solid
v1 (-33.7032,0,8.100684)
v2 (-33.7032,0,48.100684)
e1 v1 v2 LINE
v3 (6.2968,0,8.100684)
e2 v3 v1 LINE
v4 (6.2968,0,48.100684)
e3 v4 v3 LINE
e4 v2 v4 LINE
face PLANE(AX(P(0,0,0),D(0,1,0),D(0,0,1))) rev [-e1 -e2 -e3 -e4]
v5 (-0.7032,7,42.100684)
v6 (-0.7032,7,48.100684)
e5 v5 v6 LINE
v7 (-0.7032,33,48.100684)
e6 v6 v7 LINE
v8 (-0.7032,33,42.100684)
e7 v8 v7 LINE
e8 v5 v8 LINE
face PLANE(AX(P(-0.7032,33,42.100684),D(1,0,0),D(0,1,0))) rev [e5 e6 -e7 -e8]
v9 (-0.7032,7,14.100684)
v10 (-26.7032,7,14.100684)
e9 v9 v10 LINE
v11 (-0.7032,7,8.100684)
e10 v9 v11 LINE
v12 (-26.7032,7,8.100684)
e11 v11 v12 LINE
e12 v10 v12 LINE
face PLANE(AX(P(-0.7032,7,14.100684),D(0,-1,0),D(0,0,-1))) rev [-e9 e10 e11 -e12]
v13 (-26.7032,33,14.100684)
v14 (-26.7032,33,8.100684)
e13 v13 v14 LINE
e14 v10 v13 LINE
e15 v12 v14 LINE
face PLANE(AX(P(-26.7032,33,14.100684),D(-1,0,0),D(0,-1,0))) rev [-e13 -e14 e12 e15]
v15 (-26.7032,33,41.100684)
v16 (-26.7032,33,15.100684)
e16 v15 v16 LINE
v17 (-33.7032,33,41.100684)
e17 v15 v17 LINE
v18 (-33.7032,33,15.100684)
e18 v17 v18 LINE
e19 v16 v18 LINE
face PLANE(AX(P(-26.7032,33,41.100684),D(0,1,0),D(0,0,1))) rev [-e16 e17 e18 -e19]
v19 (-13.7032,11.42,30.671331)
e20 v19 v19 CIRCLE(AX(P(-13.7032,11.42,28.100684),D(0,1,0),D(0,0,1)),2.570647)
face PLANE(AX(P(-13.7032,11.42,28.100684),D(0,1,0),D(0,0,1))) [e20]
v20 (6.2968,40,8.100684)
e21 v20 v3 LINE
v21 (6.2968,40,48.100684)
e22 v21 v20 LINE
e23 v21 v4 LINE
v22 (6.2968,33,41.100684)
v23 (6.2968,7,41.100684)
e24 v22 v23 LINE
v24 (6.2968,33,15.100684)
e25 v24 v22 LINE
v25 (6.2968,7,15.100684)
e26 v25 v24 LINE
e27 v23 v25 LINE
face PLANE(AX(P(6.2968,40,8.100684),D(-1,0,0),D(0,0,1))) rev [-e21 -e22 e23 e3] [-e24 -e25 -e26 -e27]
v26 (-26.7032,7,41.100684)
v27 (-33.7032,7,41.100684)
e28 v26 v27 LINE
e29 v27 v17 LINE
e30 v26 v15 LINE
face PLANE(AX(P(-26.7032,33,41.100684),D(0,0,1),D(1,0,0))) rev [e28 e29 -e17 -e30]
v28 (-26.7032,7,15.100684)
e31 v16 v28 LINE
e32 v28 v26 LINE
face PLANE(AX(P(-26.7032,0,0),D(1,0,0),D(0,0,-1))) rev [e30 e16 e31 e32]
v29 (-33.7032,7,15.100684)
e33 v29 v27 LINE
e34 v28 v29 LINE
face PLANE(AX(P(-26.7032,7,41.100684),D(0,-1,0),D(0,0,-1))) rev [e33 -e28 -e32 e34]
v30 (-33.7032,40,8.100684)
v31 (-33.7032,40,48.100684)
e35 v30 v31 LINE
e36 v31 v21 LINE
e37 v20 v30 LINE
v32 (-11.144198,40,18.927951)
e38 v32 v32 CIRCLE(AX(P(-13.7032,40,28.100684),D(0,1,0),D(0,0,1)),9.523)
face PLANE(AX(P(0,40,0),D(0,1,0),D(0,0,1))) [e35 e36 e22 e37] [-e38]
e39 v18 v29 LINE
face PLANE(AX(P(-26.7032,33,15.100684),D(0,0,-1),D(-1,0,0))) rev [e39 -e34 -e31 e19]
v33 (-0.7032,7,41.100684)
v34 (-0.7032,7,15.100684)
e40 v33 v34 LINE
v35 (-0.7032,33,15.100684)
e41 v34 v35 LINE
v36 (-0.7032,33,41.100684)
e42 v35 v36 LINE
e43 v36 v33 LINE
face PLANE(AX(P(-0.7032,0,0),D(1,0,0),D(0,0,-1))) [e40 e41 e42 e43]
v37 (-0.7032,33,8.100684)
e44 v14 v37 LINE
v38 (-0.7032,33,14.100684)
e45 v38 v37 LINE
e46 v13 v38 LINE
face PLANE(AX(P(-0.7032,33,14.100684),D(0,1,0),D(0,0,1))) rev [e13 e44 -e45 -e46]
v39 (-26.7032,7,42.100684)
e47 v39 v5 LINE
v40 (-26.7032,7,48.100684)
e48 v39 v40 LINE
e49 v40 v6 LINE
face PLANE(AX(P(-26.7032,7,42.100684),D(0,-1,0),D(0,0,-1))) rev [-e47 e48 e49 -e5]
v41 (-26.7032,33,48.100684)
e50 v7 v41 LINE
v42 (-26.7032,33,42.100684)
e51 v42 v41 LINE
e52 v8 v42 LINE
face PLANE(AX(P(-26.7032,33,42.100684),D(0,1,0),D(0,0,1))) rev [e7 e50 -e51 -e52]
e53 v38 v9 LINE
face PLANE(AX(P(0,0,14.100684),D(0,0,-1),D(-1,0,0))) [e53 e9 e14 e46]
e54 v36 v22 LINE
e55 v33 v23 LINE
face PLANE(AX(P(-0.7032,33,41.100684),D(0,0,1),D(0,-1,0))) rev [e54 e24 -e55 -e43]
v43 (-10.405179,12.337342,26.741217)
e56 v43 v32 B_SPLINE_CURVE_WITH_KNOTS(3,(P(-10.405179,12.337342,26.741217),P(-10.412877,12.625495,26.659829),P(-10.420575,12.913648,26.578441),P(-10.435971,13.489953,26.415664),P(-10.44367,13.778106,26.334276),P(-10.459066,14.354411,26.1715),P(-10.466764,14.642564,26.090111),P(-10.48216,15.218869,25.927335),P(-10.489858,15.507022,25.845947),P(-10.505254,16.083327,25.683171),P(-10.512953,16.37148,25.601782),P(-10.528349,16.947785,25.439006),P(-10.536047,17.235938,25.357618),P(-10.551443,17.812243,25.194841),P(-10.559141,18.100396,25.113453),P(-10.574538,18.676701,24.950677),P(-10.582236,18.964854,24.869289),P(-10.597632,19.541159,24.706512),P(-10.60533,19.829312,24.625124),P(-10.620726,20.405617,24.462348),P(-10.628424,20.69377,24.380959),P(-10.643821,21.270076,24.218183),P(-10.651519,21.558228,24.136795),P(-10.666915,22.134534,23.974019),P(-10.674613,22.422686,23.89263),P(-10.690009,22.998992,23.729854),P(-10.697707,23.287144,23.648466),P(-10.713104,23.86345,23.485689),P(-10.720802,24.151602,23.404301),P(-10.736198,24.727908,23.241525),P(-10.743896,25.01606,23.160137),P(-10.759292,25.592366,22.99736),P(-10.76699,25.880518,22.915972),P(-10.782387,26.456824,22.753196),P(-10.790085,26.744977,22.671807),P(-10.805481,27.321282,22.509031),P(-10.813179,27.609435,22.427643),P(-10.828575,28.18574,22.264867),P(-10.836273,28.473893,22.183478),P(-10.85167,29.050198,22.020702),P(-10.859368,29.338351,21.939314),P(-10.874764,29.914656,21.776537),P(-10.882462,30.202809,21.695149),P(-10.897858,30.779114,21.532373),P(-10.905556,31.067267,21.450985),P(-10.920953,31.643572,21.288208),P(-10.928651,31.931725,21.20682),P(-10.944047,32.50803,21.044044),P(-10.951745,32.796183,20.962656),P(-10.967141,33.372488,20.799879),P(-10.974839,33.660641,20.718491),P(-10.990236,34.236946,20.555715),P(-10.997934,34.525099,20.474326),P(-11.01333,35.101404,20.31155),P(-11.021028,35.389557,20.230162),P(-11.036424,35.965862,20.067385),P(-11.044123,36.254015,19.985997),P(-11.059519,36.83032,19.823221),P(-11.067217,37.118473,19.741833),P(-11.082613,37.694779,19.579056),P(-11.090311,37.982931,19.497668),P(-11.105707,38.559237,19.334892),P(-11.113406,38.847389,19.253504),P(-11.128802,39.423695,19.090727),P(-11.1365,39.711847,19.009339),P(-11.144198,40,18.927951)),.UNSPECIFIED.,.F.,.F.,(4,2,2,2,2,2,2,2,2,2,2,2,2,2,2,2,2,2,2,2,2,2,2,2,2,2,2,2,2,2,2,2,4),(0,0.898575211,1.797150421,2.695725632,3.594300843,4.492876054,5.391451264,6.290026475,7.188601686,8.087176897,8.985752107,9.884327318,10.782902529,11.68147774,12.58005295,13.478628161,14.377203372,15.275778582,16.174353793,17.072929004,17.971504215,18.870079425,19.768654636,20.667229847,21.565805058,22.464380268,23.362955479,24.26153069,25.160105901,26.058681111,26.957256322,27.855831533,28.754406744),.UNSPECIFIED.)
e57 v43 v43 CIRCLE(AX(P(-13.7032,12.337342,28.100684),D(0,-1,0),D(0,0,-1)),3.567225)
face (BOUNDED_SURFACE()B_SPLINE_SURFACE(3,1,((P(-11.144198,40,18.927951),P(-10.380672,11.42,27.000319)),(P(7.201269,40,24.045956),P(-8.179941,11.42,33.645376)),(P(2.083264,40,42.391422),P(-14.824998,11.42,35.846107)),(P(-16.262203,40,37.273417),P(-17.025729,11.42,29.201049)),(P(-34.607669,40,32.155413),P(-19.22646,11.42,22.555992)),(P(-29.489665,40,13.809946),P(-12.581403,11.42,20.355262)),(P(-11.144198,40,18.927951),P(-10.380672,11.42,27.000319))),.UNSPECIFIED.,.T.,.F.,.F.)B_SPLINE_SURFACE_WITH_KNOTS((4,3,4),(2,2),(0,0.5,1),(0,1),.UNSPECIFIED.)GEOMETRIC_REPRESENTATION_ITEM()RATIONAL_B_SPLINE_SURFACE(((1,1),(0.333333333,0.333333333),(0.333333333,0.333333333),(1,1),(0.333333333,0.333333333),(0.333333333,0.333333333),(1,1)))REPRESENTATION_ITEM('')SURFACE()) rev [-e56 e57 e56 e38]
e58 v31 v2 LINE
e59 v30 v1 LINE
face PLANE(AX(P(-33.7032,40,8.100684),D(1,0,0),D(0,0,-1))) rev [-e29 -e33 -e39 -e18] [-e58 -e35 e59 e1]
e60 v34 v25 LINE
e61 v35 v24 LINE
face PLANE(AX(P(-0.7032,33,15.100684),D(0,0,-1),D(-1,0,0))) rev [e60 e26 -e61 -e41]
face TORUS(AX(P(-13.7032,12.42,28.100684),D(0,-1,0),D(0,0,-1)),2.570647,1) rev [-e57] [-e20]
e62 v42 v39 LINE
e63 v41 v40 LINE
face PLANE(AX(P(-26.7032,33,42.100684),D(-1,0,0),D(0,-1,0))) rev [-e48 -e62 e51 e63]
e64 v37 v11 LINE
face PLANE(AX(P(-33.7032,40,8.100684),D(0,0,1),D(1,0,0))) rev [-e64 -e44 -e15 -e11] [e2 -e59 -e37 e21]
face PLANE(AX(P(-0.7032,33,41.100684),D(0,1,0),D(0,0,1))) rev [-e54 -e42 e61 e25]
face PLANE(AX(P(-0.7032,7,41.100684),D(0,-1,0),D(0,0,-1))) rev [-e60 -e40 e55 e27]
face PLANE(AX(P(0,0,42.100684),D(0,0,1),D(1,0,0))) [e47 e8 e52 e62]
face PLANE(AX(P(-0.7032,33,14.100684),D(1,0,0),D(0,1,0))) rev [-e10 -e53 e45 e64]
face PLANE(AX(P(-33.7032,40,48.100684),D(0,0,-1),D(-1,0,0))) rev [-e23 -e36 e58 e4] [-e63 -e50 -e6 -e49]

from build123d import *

# Parameters (mm, degrees)
ESBO_O1_W                = 40
ESBO_O1_H                = 40
RESSALTO_EXTRUS_O1_DEPTH = 40
FILETE1_R                = 1
ESBO_O10_W               = 26
ESBO_O10_H               = 26
CORTE_EXTRUS_O3_DEPTH    = 7
ESBO_O11_W               = 26
ESBO_O11_H               = 26
CORTE_EXTRUS_O6_DEPTH    = 6
ESBO_O12_W               = 26
ESBO_O12_H               = 26
CORTE_EXTRUS_O7_DEPTH    = 6
ESBO_O13_W               = 26
ESBO_O13_H               = 26
CORTE_EXTRUS_O8_DEPTH    = 7


with BuildPart() as part:
    # Esboço1 → Ressalto-extrusão1 (new body)
    with BuildSketch(Plane(origin=(0, 0, 0), x_dir=(1, 0, 0), z_dir=(0, 1, 0))):
        with Locations((-13.703200382, -28.10068404)):
            Rectangle(ESBO_O1_W, ESBO_O1_H)
    extrude(amount=RESSALTO_EXTRUS_O1_DEPTH)

    # Loft de corte4: read off the stored shape, not the designer's step
    # Loft de corte4: loft between two sections, ruled curve by curve
    loft_de_corte4_from = [
        Edge.make_bspline([(-11.144198007, 40, 18.927950759), (7.201268555, 40, 24.04595551), (2.083263805, 40, 42.391422072), (-16.262202757, 40, 37.273417321), (-34.607669319, 40, 32.155412571), (-29.489664569, 40, 13.809946009), (-11.144198007, 40, 18.927950759)], [0, 0, 0, 0, 0.5, 0.5, 0.5, 1, 1, 1, 1], 3, [1, 0.333333333, 0.333333333, 1, 0.333333333, 0.333333333, 1]),
    ]
    loft_de_corte4_to = [
        Edge.make_bspline([(-10.380671839, 11.42, 27.000318611), (-8.179940979, 11.42, 33.645375697), (-14.824998066, 11.42, 35.846106557), (-17.025728925, 11.42, 29.20104947), (-19.226459785, 11.42, 22.555992384), (-12.581402699, 11.42, 20.355261524), (-10.380671839, 11.42, 27.000318611)], [0, 0, 0, 0, 0.5, 0.5, 0.5, 1, 1, 1, 1], 3, [1, 0.333333333, 0.333333333, 1, 0.333333333, 0.333333333, 1]),
    ]
    loft_de_corte4 = Solid(Shell([*[Face.make_surface_from_curves(loft_de_corte4_from[k], loft_de_corte4_to[k]) for k in range(1)], Face(Wire(loft_de_corte4_from)), Face(Wire(loft_de_corte4_to))]))
    add(loft_de_corte4, mode=Mode.SUBTRACT)

    # Filete1
    filete1_edges = [part.edges().sort_by_distance(p)[0] for p in [
        (-17.025728925, 11.42, 29.20104947),
    ]]
    fillet(filete1_edges, radius=FILETE1_R)

    # Esboço10 → Corte-extrusão3 (cut)
    with BuildSketch(Plane.ZY.offset(33.703200382)):
        with Locations((28.10068404, 20)):
            Rectangle(ESBO_O10_W, ESBO_O10_H)
    extrude(amount=-CORTE_EXTRUS_O3_DEPTH, mode=Mode.SUBTRACT)

    # Esboço11 → Corte-extrusão6 (cut)
    with BuildSketch(Plane(origin=(0, 0, 8.10068404), x_dir=(-1, 0, 0), z_dir=(0, 0, -1))):
        with Locations((13.703200382, 20)):
            Rectangle(ESBO_O11_W, ESBO_O11_H)
    extrude(amount=-CORTE_EXTRUS_O6_DEPTH, mode=Mode.SUBTRACT)

    # Esboço12 → Corte-extrusão7 (cut)
    with BuildSketch(Plane.XY.offset(48.10068404)):
        with Locations((-13.703200382, 20)):
            Rectangle(ESBO_O12_W, ESBO_O12_H)
    extrude(amount=-CORTE_EXTRUS_O7_DEPTH, mode=Mode.SUBTRACT)

    # Esboço13 → Corte-extrusão8 (cut)
    with BuildSketch(Plane(origin=(6.296799618, 0, 0), x_dir=(0, 0, -1), z_dir=(1, 0, 0))):
        with Locations((-28.10068404, 20)):
            Rectangle(ESBO_O13_W, ESBO_O13_H)
    extrude(amount=-CORTE_EXTRUS_O8_DEPTH, mode=Mode.SUBTRACT)


solid = part.part
